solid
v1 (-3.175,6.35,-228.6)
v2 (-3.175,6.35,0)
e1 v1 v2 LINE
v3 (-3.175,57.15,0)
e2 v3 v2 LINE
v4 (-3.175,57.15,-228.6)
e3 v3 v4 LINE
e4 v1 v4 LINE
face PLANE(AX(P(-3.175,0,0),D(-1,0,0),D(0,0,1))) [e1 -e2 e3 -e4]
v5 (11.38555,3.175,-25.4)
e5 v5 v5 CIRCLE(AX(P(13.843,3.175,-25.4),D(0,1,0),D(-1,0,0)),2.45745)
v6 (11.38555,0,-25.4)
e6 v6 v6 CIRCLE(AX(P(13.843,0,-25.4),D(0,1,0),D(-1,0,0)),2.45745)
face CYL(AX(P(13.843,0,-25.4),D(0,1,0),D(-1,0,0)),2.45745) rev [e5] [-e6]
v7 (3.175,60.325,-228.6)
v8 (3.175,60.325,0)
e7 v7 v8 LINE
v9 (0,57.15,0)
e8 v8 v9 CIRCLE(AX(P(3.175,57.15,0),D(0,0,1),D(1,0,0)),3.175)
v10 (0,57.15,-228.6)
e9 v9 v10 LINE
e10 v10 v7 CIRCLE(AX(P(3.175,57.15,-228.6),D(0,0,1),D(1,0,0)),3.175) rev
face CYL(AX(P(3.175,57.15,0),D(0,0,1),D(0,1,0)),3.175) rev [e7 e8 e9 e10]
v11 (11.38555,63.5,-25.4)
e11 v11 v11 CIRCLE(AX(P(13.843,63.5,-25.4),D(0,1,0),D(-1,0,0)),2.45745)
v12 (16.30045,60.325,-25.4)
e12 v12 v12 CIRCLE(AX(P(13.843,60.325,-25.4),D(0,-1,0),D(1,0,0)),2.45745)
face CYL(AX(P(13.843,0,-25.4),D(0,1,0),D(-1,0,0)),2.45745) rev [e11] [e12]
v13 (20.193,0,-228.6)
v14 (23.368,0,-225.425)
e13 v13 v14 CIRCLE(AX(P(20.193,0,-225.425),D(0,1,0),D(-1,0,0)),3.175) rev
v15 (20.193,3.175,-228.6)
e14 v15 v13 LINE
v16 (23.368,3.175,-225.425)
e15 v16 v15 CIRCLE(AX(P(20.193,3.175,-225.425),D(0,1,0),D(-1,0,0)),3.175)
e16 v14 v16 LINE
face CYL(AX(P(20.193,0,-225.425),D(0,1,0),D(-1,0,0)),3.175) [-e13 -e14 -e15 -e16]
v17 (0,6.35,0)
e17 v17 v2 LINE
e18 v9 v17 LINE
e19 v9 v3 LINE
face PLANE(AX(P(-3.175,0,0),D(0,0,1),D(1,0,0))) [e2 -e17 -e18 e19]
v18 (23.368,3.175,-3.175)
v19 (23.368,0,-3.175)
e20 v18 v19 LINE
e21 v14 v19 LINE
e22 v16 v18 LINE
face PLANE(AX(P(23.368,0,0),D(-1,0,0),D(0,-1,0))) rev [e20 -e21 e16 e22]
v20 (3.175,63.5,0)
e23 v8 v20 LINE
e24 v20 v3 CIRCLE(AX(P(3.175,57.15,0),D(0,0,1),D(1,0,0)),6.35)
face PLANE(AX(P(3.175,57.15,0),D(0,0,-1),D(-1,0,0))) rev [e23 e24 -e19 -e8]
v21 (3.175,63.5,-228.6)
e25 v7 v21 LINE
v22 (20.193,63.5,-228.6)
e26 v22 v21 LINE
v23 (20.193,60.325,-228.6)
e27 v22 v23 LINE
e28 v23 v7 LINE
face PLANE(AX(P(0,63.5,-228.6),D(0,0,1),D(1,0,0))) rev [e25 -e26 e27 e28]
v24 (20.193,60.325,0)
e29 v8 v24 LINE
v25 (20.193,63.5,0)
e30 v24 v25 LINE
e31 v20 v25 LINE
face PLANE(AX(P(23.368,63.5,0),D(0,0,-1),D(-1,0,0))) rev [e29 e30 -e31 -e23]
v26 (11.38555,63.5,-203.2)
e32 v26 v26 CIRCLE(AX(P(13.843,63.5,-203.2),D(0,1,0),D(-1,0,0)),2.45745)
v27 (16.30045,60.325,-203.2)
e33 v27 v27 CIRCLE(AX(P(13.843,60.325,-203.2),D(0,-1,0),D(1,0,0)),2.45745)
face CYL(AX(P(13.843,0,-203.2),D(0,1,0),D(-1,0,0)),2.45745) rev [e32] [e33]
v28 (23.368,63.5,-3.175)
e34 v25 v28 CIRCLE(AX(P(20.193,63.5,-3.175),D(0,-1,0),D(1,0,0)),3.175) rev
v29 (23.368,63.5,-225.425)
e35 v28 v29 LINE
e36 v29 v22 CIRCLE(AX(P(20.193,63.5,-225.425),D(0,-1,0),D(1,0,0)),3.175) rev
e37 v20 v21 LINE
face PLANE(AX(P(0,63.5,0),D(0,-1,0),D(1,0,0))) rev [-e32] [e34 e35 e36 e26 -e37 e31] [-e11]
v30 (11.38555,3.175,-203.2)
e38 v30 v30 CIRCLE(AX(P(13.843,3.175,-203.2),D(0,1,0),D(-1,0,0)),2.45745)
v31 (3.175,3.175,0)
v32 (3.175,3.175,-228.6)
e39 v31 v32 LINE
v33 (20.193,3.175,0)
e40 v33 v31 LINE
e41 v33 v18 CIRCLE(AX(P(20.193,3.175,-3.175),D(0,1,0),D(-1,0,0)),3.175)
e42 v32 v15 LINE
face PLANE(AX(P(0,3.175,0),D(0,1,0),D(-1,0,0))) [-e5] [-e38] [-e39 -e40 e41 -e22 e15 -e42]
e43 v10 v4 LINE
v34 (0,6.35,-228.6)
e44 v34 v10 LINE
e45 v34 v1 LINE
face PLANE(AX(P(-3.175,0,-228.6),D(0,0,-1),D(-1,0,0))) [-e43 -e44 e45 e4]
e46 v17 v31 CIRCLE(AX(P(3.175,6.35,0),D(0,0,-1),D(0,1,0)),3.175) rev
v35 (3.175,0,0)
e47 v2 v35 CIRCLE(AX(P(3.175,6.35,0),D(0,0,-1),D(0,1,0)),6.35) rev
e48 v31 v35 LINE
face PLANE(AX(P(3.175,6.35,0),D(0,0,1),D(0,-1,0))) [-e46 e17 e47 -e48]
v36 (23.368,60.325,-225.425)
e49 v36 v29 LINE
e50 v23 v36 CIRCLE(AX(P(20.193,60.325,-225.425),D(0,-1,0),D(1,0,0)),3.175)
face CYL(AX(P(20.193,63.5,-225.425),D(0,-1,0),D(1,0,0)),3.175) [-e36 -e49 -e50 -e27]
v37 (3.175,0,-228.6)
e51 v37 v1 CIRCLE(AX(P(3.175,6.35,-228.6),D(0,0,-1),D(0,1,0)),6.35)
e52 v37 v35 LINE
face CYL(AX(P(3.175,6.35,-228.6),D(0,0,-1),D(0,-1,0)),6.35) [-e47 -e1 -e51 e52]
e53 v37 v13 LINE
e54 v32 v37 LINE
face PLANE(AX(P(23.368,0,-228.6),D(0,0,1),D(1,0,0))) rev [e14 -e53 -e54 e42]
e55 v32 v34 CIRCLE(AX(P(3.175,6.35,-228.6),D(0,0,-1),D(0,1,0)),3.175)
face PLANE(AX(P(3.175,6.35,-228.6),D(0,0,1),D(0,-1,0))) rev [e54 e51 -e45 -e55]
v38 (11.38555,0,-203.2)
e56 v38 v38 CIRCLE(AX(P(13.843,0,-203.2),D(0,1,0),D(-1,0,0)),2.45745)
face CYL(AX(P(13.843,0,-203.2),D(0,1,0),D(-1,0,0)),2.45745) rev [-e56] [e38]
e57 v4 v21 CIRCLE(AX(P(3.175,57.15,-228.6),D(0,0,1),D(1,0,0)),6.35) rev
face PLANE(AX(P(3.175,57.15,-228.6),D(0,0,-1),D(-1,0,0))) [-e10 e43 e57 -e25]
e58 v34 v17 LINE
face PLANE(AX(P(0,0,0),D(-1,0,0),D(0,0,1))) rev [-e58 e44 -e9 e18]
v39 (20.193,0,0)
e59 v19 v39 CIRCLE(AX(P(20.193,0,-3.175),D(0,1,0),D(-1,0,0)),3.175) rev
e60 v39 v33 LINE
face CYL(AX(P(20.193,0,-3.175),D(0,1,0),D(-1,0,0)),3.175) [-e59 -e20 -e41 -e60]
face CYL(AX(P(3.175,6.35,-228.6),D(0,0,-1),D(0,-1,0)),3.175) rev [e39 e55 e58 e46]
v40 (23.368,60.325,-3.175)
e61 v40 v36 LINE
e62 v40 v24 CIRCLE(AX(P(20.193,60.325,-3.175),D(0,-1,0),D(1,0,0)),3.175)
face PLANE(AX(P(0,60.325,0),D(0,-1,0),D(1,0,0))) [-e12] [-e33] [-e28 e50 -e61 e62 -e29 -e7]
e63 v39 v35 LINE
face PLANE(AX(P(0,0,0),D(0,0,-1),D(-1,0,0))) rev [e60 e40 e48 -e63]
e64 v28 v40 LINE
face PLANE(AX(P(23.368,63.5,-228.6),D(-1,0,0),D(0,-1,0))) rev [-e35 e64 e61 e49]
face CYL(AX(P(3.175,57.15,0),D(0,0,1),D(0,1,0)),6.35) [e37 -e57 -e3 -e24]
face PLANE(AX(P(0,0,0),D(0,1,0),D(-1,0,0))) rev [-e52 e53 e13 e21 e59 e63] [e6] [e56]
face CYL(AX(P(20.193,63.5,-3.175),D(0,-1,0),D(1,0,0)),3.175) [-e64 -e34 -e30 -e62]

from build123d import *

# Parameters (mm, degrees)
SKETCH1_W                      = 228.6
SKETCH1_H                      = 63.5
BASE_FLANGE1_DEPTH             = 3.175
EDGE_FLANGE1_STRIP_W           = 19.05
EDGE_FLANGE1_STRIP_H           = 3.175
EDGE_FLANGE1_STRIP_CUT_DEPTH   = 228.6
EDGE_FLANGE1_STRIP_2_W         = 19.05
EDGE_FLANGE1_STRIP_2_H         = 3.175
EDGE_FLANGE1_STRIP_CUT_2_DEPTH = 228.6
EDGE_FLANGE1_DEPTH             = 228.6
EDGE_FLANGE1_BEND_DEPTH        = 228.6
SKETCH12_R                     = 2.45745
CUT_EXTRUDE1_DEPTH             = 239.403593564
FILLET1_R                      = 3.175


# Sheet-metal steps are written as plain solids
with BuildPart() as part:
    # Sketch1 → Base-Flange1 (new body)
    with BuildSketch(Plane(origin=(0, 0, 0), x_dir=(0, 0, -1), z_dir=(1, 0, 0))):
        with Locations((114.3, 31.75)):
            Rectangle(SKETCH1_W, SKETCH1_H)
    extrude(amount=-BASE_FLANGE1_DEPTH)

    # Edge-Flange1 strip (across the edge) → Edge-Flange1 strip cut (cut)
    with BuildSketch(Plane(origin=(0, 63.5, -228.6), x_dir=(0, -1, 0), z_dir=(0, 0, 1))):
        with Locations((-3.175, -1.5875)):
            Rectangle(EDGE_FLANGE1_STRIP_W, EDGE_FLANGE1_STRIP_H)
    extrude(amount=EDGE_FLANGE1_STRIP_CUT_DEPTH, mode=Mode.SUBTRACT)

    # Edge-Flange1 strip 2 (across the edge) → Edge-Flange1 strip cut 2 (cut)
    with BuildSketch(Plane.YX):
        with Locations((-3.175, -1.5875)):
            Rectangle(EDGE_FLANGE1_STRIP_2_W, EDGE_FLANGE1_STRIP_2_H)
    extrude(amount=EDGE_FLANGE1_STRIP_CUT_2_DEPTH, mode=Mode.SUBTRACT)

    # Edge-Flange1 section (across the edge) → Edge-Flange1 (add)
    with BuildSketch(Plane(origin=(0, 63.5, -228.6), x_dir=(0, -1, 0), z_dir=(0, 0, 1))):
        with BuildLine():
            Line((0, 3.175), (0, 23.368))
            Line((0, 23.368), (3.175, 23.368))
            Line((3.175, 23.368), (3.175, 3.175))
            ThreePointArc((3.175, 3.175), (4.10493597, 0.92993597), (6.35, 0))
            Line((6.35, 0), (6.35, -3.175))
            ThreePointArc((6.35, -3.175), (1.859871939, -1.315128061), (0, 3.175))
        make_face()
    extrude(amount=EDGE_FLANGE1_DEPTH)

    # Edge-Flange1 section 2 (across the edge) → Edge-Flange1 bend (add)
    with BuildSketch(Plane.YX):
        with BuildLine():
            Line((0, 3.175), (0, 23.368))
            Line((0, 23.368), (3.175, 23.368))
            Line((3.175, 23.368), (3.175, 3.175))
            ThreePointArc((3.175, 3.175), (4.10493597, 0.92993597), (6.35, 0))
            Line((6.35, 0), (6.35, -3.175))
            ThreePointArc((6.35, -3.175), (1.859871939, -1.315128061), (0, 3.175))
        make_face()
    extrude(amount=EDGE_FLANGE1_BEND_DEPTH)

    # Sketch12 → Cut-Extrude1 (cut, through all)
    with BuildSketch(Plane(origin=(0, 63.5, 0), x_dir=(1, 0, 0), z_dir=(0, 1, 0))):
        with Locations(Location((13.843, 203.2, 0), (0, 0, 180))):
            Circle(SKETCH12_R)
        with Locations(Location((13.843, 25.4, 0), (0, 0, 180))):
            Circle(SKETCH12_R)
    extrude(amount=-CUT_EXTRUDE1_DEPTH, mode=Mode.SUBTRACT)

    # Fillet1
    fillet1_edges = [part.edges().sort_by_distance(p)[0] for p in [
        (23.368, 61.9125, -228.6),
        (23.368, 61.9125, 0),
        (23.368, 1.5875, 0),
        (23.368, 1.5875, -228.6),
    ]]
    fillet(fillet1_edges, radius=FILLET1_R)


solid = part.part
